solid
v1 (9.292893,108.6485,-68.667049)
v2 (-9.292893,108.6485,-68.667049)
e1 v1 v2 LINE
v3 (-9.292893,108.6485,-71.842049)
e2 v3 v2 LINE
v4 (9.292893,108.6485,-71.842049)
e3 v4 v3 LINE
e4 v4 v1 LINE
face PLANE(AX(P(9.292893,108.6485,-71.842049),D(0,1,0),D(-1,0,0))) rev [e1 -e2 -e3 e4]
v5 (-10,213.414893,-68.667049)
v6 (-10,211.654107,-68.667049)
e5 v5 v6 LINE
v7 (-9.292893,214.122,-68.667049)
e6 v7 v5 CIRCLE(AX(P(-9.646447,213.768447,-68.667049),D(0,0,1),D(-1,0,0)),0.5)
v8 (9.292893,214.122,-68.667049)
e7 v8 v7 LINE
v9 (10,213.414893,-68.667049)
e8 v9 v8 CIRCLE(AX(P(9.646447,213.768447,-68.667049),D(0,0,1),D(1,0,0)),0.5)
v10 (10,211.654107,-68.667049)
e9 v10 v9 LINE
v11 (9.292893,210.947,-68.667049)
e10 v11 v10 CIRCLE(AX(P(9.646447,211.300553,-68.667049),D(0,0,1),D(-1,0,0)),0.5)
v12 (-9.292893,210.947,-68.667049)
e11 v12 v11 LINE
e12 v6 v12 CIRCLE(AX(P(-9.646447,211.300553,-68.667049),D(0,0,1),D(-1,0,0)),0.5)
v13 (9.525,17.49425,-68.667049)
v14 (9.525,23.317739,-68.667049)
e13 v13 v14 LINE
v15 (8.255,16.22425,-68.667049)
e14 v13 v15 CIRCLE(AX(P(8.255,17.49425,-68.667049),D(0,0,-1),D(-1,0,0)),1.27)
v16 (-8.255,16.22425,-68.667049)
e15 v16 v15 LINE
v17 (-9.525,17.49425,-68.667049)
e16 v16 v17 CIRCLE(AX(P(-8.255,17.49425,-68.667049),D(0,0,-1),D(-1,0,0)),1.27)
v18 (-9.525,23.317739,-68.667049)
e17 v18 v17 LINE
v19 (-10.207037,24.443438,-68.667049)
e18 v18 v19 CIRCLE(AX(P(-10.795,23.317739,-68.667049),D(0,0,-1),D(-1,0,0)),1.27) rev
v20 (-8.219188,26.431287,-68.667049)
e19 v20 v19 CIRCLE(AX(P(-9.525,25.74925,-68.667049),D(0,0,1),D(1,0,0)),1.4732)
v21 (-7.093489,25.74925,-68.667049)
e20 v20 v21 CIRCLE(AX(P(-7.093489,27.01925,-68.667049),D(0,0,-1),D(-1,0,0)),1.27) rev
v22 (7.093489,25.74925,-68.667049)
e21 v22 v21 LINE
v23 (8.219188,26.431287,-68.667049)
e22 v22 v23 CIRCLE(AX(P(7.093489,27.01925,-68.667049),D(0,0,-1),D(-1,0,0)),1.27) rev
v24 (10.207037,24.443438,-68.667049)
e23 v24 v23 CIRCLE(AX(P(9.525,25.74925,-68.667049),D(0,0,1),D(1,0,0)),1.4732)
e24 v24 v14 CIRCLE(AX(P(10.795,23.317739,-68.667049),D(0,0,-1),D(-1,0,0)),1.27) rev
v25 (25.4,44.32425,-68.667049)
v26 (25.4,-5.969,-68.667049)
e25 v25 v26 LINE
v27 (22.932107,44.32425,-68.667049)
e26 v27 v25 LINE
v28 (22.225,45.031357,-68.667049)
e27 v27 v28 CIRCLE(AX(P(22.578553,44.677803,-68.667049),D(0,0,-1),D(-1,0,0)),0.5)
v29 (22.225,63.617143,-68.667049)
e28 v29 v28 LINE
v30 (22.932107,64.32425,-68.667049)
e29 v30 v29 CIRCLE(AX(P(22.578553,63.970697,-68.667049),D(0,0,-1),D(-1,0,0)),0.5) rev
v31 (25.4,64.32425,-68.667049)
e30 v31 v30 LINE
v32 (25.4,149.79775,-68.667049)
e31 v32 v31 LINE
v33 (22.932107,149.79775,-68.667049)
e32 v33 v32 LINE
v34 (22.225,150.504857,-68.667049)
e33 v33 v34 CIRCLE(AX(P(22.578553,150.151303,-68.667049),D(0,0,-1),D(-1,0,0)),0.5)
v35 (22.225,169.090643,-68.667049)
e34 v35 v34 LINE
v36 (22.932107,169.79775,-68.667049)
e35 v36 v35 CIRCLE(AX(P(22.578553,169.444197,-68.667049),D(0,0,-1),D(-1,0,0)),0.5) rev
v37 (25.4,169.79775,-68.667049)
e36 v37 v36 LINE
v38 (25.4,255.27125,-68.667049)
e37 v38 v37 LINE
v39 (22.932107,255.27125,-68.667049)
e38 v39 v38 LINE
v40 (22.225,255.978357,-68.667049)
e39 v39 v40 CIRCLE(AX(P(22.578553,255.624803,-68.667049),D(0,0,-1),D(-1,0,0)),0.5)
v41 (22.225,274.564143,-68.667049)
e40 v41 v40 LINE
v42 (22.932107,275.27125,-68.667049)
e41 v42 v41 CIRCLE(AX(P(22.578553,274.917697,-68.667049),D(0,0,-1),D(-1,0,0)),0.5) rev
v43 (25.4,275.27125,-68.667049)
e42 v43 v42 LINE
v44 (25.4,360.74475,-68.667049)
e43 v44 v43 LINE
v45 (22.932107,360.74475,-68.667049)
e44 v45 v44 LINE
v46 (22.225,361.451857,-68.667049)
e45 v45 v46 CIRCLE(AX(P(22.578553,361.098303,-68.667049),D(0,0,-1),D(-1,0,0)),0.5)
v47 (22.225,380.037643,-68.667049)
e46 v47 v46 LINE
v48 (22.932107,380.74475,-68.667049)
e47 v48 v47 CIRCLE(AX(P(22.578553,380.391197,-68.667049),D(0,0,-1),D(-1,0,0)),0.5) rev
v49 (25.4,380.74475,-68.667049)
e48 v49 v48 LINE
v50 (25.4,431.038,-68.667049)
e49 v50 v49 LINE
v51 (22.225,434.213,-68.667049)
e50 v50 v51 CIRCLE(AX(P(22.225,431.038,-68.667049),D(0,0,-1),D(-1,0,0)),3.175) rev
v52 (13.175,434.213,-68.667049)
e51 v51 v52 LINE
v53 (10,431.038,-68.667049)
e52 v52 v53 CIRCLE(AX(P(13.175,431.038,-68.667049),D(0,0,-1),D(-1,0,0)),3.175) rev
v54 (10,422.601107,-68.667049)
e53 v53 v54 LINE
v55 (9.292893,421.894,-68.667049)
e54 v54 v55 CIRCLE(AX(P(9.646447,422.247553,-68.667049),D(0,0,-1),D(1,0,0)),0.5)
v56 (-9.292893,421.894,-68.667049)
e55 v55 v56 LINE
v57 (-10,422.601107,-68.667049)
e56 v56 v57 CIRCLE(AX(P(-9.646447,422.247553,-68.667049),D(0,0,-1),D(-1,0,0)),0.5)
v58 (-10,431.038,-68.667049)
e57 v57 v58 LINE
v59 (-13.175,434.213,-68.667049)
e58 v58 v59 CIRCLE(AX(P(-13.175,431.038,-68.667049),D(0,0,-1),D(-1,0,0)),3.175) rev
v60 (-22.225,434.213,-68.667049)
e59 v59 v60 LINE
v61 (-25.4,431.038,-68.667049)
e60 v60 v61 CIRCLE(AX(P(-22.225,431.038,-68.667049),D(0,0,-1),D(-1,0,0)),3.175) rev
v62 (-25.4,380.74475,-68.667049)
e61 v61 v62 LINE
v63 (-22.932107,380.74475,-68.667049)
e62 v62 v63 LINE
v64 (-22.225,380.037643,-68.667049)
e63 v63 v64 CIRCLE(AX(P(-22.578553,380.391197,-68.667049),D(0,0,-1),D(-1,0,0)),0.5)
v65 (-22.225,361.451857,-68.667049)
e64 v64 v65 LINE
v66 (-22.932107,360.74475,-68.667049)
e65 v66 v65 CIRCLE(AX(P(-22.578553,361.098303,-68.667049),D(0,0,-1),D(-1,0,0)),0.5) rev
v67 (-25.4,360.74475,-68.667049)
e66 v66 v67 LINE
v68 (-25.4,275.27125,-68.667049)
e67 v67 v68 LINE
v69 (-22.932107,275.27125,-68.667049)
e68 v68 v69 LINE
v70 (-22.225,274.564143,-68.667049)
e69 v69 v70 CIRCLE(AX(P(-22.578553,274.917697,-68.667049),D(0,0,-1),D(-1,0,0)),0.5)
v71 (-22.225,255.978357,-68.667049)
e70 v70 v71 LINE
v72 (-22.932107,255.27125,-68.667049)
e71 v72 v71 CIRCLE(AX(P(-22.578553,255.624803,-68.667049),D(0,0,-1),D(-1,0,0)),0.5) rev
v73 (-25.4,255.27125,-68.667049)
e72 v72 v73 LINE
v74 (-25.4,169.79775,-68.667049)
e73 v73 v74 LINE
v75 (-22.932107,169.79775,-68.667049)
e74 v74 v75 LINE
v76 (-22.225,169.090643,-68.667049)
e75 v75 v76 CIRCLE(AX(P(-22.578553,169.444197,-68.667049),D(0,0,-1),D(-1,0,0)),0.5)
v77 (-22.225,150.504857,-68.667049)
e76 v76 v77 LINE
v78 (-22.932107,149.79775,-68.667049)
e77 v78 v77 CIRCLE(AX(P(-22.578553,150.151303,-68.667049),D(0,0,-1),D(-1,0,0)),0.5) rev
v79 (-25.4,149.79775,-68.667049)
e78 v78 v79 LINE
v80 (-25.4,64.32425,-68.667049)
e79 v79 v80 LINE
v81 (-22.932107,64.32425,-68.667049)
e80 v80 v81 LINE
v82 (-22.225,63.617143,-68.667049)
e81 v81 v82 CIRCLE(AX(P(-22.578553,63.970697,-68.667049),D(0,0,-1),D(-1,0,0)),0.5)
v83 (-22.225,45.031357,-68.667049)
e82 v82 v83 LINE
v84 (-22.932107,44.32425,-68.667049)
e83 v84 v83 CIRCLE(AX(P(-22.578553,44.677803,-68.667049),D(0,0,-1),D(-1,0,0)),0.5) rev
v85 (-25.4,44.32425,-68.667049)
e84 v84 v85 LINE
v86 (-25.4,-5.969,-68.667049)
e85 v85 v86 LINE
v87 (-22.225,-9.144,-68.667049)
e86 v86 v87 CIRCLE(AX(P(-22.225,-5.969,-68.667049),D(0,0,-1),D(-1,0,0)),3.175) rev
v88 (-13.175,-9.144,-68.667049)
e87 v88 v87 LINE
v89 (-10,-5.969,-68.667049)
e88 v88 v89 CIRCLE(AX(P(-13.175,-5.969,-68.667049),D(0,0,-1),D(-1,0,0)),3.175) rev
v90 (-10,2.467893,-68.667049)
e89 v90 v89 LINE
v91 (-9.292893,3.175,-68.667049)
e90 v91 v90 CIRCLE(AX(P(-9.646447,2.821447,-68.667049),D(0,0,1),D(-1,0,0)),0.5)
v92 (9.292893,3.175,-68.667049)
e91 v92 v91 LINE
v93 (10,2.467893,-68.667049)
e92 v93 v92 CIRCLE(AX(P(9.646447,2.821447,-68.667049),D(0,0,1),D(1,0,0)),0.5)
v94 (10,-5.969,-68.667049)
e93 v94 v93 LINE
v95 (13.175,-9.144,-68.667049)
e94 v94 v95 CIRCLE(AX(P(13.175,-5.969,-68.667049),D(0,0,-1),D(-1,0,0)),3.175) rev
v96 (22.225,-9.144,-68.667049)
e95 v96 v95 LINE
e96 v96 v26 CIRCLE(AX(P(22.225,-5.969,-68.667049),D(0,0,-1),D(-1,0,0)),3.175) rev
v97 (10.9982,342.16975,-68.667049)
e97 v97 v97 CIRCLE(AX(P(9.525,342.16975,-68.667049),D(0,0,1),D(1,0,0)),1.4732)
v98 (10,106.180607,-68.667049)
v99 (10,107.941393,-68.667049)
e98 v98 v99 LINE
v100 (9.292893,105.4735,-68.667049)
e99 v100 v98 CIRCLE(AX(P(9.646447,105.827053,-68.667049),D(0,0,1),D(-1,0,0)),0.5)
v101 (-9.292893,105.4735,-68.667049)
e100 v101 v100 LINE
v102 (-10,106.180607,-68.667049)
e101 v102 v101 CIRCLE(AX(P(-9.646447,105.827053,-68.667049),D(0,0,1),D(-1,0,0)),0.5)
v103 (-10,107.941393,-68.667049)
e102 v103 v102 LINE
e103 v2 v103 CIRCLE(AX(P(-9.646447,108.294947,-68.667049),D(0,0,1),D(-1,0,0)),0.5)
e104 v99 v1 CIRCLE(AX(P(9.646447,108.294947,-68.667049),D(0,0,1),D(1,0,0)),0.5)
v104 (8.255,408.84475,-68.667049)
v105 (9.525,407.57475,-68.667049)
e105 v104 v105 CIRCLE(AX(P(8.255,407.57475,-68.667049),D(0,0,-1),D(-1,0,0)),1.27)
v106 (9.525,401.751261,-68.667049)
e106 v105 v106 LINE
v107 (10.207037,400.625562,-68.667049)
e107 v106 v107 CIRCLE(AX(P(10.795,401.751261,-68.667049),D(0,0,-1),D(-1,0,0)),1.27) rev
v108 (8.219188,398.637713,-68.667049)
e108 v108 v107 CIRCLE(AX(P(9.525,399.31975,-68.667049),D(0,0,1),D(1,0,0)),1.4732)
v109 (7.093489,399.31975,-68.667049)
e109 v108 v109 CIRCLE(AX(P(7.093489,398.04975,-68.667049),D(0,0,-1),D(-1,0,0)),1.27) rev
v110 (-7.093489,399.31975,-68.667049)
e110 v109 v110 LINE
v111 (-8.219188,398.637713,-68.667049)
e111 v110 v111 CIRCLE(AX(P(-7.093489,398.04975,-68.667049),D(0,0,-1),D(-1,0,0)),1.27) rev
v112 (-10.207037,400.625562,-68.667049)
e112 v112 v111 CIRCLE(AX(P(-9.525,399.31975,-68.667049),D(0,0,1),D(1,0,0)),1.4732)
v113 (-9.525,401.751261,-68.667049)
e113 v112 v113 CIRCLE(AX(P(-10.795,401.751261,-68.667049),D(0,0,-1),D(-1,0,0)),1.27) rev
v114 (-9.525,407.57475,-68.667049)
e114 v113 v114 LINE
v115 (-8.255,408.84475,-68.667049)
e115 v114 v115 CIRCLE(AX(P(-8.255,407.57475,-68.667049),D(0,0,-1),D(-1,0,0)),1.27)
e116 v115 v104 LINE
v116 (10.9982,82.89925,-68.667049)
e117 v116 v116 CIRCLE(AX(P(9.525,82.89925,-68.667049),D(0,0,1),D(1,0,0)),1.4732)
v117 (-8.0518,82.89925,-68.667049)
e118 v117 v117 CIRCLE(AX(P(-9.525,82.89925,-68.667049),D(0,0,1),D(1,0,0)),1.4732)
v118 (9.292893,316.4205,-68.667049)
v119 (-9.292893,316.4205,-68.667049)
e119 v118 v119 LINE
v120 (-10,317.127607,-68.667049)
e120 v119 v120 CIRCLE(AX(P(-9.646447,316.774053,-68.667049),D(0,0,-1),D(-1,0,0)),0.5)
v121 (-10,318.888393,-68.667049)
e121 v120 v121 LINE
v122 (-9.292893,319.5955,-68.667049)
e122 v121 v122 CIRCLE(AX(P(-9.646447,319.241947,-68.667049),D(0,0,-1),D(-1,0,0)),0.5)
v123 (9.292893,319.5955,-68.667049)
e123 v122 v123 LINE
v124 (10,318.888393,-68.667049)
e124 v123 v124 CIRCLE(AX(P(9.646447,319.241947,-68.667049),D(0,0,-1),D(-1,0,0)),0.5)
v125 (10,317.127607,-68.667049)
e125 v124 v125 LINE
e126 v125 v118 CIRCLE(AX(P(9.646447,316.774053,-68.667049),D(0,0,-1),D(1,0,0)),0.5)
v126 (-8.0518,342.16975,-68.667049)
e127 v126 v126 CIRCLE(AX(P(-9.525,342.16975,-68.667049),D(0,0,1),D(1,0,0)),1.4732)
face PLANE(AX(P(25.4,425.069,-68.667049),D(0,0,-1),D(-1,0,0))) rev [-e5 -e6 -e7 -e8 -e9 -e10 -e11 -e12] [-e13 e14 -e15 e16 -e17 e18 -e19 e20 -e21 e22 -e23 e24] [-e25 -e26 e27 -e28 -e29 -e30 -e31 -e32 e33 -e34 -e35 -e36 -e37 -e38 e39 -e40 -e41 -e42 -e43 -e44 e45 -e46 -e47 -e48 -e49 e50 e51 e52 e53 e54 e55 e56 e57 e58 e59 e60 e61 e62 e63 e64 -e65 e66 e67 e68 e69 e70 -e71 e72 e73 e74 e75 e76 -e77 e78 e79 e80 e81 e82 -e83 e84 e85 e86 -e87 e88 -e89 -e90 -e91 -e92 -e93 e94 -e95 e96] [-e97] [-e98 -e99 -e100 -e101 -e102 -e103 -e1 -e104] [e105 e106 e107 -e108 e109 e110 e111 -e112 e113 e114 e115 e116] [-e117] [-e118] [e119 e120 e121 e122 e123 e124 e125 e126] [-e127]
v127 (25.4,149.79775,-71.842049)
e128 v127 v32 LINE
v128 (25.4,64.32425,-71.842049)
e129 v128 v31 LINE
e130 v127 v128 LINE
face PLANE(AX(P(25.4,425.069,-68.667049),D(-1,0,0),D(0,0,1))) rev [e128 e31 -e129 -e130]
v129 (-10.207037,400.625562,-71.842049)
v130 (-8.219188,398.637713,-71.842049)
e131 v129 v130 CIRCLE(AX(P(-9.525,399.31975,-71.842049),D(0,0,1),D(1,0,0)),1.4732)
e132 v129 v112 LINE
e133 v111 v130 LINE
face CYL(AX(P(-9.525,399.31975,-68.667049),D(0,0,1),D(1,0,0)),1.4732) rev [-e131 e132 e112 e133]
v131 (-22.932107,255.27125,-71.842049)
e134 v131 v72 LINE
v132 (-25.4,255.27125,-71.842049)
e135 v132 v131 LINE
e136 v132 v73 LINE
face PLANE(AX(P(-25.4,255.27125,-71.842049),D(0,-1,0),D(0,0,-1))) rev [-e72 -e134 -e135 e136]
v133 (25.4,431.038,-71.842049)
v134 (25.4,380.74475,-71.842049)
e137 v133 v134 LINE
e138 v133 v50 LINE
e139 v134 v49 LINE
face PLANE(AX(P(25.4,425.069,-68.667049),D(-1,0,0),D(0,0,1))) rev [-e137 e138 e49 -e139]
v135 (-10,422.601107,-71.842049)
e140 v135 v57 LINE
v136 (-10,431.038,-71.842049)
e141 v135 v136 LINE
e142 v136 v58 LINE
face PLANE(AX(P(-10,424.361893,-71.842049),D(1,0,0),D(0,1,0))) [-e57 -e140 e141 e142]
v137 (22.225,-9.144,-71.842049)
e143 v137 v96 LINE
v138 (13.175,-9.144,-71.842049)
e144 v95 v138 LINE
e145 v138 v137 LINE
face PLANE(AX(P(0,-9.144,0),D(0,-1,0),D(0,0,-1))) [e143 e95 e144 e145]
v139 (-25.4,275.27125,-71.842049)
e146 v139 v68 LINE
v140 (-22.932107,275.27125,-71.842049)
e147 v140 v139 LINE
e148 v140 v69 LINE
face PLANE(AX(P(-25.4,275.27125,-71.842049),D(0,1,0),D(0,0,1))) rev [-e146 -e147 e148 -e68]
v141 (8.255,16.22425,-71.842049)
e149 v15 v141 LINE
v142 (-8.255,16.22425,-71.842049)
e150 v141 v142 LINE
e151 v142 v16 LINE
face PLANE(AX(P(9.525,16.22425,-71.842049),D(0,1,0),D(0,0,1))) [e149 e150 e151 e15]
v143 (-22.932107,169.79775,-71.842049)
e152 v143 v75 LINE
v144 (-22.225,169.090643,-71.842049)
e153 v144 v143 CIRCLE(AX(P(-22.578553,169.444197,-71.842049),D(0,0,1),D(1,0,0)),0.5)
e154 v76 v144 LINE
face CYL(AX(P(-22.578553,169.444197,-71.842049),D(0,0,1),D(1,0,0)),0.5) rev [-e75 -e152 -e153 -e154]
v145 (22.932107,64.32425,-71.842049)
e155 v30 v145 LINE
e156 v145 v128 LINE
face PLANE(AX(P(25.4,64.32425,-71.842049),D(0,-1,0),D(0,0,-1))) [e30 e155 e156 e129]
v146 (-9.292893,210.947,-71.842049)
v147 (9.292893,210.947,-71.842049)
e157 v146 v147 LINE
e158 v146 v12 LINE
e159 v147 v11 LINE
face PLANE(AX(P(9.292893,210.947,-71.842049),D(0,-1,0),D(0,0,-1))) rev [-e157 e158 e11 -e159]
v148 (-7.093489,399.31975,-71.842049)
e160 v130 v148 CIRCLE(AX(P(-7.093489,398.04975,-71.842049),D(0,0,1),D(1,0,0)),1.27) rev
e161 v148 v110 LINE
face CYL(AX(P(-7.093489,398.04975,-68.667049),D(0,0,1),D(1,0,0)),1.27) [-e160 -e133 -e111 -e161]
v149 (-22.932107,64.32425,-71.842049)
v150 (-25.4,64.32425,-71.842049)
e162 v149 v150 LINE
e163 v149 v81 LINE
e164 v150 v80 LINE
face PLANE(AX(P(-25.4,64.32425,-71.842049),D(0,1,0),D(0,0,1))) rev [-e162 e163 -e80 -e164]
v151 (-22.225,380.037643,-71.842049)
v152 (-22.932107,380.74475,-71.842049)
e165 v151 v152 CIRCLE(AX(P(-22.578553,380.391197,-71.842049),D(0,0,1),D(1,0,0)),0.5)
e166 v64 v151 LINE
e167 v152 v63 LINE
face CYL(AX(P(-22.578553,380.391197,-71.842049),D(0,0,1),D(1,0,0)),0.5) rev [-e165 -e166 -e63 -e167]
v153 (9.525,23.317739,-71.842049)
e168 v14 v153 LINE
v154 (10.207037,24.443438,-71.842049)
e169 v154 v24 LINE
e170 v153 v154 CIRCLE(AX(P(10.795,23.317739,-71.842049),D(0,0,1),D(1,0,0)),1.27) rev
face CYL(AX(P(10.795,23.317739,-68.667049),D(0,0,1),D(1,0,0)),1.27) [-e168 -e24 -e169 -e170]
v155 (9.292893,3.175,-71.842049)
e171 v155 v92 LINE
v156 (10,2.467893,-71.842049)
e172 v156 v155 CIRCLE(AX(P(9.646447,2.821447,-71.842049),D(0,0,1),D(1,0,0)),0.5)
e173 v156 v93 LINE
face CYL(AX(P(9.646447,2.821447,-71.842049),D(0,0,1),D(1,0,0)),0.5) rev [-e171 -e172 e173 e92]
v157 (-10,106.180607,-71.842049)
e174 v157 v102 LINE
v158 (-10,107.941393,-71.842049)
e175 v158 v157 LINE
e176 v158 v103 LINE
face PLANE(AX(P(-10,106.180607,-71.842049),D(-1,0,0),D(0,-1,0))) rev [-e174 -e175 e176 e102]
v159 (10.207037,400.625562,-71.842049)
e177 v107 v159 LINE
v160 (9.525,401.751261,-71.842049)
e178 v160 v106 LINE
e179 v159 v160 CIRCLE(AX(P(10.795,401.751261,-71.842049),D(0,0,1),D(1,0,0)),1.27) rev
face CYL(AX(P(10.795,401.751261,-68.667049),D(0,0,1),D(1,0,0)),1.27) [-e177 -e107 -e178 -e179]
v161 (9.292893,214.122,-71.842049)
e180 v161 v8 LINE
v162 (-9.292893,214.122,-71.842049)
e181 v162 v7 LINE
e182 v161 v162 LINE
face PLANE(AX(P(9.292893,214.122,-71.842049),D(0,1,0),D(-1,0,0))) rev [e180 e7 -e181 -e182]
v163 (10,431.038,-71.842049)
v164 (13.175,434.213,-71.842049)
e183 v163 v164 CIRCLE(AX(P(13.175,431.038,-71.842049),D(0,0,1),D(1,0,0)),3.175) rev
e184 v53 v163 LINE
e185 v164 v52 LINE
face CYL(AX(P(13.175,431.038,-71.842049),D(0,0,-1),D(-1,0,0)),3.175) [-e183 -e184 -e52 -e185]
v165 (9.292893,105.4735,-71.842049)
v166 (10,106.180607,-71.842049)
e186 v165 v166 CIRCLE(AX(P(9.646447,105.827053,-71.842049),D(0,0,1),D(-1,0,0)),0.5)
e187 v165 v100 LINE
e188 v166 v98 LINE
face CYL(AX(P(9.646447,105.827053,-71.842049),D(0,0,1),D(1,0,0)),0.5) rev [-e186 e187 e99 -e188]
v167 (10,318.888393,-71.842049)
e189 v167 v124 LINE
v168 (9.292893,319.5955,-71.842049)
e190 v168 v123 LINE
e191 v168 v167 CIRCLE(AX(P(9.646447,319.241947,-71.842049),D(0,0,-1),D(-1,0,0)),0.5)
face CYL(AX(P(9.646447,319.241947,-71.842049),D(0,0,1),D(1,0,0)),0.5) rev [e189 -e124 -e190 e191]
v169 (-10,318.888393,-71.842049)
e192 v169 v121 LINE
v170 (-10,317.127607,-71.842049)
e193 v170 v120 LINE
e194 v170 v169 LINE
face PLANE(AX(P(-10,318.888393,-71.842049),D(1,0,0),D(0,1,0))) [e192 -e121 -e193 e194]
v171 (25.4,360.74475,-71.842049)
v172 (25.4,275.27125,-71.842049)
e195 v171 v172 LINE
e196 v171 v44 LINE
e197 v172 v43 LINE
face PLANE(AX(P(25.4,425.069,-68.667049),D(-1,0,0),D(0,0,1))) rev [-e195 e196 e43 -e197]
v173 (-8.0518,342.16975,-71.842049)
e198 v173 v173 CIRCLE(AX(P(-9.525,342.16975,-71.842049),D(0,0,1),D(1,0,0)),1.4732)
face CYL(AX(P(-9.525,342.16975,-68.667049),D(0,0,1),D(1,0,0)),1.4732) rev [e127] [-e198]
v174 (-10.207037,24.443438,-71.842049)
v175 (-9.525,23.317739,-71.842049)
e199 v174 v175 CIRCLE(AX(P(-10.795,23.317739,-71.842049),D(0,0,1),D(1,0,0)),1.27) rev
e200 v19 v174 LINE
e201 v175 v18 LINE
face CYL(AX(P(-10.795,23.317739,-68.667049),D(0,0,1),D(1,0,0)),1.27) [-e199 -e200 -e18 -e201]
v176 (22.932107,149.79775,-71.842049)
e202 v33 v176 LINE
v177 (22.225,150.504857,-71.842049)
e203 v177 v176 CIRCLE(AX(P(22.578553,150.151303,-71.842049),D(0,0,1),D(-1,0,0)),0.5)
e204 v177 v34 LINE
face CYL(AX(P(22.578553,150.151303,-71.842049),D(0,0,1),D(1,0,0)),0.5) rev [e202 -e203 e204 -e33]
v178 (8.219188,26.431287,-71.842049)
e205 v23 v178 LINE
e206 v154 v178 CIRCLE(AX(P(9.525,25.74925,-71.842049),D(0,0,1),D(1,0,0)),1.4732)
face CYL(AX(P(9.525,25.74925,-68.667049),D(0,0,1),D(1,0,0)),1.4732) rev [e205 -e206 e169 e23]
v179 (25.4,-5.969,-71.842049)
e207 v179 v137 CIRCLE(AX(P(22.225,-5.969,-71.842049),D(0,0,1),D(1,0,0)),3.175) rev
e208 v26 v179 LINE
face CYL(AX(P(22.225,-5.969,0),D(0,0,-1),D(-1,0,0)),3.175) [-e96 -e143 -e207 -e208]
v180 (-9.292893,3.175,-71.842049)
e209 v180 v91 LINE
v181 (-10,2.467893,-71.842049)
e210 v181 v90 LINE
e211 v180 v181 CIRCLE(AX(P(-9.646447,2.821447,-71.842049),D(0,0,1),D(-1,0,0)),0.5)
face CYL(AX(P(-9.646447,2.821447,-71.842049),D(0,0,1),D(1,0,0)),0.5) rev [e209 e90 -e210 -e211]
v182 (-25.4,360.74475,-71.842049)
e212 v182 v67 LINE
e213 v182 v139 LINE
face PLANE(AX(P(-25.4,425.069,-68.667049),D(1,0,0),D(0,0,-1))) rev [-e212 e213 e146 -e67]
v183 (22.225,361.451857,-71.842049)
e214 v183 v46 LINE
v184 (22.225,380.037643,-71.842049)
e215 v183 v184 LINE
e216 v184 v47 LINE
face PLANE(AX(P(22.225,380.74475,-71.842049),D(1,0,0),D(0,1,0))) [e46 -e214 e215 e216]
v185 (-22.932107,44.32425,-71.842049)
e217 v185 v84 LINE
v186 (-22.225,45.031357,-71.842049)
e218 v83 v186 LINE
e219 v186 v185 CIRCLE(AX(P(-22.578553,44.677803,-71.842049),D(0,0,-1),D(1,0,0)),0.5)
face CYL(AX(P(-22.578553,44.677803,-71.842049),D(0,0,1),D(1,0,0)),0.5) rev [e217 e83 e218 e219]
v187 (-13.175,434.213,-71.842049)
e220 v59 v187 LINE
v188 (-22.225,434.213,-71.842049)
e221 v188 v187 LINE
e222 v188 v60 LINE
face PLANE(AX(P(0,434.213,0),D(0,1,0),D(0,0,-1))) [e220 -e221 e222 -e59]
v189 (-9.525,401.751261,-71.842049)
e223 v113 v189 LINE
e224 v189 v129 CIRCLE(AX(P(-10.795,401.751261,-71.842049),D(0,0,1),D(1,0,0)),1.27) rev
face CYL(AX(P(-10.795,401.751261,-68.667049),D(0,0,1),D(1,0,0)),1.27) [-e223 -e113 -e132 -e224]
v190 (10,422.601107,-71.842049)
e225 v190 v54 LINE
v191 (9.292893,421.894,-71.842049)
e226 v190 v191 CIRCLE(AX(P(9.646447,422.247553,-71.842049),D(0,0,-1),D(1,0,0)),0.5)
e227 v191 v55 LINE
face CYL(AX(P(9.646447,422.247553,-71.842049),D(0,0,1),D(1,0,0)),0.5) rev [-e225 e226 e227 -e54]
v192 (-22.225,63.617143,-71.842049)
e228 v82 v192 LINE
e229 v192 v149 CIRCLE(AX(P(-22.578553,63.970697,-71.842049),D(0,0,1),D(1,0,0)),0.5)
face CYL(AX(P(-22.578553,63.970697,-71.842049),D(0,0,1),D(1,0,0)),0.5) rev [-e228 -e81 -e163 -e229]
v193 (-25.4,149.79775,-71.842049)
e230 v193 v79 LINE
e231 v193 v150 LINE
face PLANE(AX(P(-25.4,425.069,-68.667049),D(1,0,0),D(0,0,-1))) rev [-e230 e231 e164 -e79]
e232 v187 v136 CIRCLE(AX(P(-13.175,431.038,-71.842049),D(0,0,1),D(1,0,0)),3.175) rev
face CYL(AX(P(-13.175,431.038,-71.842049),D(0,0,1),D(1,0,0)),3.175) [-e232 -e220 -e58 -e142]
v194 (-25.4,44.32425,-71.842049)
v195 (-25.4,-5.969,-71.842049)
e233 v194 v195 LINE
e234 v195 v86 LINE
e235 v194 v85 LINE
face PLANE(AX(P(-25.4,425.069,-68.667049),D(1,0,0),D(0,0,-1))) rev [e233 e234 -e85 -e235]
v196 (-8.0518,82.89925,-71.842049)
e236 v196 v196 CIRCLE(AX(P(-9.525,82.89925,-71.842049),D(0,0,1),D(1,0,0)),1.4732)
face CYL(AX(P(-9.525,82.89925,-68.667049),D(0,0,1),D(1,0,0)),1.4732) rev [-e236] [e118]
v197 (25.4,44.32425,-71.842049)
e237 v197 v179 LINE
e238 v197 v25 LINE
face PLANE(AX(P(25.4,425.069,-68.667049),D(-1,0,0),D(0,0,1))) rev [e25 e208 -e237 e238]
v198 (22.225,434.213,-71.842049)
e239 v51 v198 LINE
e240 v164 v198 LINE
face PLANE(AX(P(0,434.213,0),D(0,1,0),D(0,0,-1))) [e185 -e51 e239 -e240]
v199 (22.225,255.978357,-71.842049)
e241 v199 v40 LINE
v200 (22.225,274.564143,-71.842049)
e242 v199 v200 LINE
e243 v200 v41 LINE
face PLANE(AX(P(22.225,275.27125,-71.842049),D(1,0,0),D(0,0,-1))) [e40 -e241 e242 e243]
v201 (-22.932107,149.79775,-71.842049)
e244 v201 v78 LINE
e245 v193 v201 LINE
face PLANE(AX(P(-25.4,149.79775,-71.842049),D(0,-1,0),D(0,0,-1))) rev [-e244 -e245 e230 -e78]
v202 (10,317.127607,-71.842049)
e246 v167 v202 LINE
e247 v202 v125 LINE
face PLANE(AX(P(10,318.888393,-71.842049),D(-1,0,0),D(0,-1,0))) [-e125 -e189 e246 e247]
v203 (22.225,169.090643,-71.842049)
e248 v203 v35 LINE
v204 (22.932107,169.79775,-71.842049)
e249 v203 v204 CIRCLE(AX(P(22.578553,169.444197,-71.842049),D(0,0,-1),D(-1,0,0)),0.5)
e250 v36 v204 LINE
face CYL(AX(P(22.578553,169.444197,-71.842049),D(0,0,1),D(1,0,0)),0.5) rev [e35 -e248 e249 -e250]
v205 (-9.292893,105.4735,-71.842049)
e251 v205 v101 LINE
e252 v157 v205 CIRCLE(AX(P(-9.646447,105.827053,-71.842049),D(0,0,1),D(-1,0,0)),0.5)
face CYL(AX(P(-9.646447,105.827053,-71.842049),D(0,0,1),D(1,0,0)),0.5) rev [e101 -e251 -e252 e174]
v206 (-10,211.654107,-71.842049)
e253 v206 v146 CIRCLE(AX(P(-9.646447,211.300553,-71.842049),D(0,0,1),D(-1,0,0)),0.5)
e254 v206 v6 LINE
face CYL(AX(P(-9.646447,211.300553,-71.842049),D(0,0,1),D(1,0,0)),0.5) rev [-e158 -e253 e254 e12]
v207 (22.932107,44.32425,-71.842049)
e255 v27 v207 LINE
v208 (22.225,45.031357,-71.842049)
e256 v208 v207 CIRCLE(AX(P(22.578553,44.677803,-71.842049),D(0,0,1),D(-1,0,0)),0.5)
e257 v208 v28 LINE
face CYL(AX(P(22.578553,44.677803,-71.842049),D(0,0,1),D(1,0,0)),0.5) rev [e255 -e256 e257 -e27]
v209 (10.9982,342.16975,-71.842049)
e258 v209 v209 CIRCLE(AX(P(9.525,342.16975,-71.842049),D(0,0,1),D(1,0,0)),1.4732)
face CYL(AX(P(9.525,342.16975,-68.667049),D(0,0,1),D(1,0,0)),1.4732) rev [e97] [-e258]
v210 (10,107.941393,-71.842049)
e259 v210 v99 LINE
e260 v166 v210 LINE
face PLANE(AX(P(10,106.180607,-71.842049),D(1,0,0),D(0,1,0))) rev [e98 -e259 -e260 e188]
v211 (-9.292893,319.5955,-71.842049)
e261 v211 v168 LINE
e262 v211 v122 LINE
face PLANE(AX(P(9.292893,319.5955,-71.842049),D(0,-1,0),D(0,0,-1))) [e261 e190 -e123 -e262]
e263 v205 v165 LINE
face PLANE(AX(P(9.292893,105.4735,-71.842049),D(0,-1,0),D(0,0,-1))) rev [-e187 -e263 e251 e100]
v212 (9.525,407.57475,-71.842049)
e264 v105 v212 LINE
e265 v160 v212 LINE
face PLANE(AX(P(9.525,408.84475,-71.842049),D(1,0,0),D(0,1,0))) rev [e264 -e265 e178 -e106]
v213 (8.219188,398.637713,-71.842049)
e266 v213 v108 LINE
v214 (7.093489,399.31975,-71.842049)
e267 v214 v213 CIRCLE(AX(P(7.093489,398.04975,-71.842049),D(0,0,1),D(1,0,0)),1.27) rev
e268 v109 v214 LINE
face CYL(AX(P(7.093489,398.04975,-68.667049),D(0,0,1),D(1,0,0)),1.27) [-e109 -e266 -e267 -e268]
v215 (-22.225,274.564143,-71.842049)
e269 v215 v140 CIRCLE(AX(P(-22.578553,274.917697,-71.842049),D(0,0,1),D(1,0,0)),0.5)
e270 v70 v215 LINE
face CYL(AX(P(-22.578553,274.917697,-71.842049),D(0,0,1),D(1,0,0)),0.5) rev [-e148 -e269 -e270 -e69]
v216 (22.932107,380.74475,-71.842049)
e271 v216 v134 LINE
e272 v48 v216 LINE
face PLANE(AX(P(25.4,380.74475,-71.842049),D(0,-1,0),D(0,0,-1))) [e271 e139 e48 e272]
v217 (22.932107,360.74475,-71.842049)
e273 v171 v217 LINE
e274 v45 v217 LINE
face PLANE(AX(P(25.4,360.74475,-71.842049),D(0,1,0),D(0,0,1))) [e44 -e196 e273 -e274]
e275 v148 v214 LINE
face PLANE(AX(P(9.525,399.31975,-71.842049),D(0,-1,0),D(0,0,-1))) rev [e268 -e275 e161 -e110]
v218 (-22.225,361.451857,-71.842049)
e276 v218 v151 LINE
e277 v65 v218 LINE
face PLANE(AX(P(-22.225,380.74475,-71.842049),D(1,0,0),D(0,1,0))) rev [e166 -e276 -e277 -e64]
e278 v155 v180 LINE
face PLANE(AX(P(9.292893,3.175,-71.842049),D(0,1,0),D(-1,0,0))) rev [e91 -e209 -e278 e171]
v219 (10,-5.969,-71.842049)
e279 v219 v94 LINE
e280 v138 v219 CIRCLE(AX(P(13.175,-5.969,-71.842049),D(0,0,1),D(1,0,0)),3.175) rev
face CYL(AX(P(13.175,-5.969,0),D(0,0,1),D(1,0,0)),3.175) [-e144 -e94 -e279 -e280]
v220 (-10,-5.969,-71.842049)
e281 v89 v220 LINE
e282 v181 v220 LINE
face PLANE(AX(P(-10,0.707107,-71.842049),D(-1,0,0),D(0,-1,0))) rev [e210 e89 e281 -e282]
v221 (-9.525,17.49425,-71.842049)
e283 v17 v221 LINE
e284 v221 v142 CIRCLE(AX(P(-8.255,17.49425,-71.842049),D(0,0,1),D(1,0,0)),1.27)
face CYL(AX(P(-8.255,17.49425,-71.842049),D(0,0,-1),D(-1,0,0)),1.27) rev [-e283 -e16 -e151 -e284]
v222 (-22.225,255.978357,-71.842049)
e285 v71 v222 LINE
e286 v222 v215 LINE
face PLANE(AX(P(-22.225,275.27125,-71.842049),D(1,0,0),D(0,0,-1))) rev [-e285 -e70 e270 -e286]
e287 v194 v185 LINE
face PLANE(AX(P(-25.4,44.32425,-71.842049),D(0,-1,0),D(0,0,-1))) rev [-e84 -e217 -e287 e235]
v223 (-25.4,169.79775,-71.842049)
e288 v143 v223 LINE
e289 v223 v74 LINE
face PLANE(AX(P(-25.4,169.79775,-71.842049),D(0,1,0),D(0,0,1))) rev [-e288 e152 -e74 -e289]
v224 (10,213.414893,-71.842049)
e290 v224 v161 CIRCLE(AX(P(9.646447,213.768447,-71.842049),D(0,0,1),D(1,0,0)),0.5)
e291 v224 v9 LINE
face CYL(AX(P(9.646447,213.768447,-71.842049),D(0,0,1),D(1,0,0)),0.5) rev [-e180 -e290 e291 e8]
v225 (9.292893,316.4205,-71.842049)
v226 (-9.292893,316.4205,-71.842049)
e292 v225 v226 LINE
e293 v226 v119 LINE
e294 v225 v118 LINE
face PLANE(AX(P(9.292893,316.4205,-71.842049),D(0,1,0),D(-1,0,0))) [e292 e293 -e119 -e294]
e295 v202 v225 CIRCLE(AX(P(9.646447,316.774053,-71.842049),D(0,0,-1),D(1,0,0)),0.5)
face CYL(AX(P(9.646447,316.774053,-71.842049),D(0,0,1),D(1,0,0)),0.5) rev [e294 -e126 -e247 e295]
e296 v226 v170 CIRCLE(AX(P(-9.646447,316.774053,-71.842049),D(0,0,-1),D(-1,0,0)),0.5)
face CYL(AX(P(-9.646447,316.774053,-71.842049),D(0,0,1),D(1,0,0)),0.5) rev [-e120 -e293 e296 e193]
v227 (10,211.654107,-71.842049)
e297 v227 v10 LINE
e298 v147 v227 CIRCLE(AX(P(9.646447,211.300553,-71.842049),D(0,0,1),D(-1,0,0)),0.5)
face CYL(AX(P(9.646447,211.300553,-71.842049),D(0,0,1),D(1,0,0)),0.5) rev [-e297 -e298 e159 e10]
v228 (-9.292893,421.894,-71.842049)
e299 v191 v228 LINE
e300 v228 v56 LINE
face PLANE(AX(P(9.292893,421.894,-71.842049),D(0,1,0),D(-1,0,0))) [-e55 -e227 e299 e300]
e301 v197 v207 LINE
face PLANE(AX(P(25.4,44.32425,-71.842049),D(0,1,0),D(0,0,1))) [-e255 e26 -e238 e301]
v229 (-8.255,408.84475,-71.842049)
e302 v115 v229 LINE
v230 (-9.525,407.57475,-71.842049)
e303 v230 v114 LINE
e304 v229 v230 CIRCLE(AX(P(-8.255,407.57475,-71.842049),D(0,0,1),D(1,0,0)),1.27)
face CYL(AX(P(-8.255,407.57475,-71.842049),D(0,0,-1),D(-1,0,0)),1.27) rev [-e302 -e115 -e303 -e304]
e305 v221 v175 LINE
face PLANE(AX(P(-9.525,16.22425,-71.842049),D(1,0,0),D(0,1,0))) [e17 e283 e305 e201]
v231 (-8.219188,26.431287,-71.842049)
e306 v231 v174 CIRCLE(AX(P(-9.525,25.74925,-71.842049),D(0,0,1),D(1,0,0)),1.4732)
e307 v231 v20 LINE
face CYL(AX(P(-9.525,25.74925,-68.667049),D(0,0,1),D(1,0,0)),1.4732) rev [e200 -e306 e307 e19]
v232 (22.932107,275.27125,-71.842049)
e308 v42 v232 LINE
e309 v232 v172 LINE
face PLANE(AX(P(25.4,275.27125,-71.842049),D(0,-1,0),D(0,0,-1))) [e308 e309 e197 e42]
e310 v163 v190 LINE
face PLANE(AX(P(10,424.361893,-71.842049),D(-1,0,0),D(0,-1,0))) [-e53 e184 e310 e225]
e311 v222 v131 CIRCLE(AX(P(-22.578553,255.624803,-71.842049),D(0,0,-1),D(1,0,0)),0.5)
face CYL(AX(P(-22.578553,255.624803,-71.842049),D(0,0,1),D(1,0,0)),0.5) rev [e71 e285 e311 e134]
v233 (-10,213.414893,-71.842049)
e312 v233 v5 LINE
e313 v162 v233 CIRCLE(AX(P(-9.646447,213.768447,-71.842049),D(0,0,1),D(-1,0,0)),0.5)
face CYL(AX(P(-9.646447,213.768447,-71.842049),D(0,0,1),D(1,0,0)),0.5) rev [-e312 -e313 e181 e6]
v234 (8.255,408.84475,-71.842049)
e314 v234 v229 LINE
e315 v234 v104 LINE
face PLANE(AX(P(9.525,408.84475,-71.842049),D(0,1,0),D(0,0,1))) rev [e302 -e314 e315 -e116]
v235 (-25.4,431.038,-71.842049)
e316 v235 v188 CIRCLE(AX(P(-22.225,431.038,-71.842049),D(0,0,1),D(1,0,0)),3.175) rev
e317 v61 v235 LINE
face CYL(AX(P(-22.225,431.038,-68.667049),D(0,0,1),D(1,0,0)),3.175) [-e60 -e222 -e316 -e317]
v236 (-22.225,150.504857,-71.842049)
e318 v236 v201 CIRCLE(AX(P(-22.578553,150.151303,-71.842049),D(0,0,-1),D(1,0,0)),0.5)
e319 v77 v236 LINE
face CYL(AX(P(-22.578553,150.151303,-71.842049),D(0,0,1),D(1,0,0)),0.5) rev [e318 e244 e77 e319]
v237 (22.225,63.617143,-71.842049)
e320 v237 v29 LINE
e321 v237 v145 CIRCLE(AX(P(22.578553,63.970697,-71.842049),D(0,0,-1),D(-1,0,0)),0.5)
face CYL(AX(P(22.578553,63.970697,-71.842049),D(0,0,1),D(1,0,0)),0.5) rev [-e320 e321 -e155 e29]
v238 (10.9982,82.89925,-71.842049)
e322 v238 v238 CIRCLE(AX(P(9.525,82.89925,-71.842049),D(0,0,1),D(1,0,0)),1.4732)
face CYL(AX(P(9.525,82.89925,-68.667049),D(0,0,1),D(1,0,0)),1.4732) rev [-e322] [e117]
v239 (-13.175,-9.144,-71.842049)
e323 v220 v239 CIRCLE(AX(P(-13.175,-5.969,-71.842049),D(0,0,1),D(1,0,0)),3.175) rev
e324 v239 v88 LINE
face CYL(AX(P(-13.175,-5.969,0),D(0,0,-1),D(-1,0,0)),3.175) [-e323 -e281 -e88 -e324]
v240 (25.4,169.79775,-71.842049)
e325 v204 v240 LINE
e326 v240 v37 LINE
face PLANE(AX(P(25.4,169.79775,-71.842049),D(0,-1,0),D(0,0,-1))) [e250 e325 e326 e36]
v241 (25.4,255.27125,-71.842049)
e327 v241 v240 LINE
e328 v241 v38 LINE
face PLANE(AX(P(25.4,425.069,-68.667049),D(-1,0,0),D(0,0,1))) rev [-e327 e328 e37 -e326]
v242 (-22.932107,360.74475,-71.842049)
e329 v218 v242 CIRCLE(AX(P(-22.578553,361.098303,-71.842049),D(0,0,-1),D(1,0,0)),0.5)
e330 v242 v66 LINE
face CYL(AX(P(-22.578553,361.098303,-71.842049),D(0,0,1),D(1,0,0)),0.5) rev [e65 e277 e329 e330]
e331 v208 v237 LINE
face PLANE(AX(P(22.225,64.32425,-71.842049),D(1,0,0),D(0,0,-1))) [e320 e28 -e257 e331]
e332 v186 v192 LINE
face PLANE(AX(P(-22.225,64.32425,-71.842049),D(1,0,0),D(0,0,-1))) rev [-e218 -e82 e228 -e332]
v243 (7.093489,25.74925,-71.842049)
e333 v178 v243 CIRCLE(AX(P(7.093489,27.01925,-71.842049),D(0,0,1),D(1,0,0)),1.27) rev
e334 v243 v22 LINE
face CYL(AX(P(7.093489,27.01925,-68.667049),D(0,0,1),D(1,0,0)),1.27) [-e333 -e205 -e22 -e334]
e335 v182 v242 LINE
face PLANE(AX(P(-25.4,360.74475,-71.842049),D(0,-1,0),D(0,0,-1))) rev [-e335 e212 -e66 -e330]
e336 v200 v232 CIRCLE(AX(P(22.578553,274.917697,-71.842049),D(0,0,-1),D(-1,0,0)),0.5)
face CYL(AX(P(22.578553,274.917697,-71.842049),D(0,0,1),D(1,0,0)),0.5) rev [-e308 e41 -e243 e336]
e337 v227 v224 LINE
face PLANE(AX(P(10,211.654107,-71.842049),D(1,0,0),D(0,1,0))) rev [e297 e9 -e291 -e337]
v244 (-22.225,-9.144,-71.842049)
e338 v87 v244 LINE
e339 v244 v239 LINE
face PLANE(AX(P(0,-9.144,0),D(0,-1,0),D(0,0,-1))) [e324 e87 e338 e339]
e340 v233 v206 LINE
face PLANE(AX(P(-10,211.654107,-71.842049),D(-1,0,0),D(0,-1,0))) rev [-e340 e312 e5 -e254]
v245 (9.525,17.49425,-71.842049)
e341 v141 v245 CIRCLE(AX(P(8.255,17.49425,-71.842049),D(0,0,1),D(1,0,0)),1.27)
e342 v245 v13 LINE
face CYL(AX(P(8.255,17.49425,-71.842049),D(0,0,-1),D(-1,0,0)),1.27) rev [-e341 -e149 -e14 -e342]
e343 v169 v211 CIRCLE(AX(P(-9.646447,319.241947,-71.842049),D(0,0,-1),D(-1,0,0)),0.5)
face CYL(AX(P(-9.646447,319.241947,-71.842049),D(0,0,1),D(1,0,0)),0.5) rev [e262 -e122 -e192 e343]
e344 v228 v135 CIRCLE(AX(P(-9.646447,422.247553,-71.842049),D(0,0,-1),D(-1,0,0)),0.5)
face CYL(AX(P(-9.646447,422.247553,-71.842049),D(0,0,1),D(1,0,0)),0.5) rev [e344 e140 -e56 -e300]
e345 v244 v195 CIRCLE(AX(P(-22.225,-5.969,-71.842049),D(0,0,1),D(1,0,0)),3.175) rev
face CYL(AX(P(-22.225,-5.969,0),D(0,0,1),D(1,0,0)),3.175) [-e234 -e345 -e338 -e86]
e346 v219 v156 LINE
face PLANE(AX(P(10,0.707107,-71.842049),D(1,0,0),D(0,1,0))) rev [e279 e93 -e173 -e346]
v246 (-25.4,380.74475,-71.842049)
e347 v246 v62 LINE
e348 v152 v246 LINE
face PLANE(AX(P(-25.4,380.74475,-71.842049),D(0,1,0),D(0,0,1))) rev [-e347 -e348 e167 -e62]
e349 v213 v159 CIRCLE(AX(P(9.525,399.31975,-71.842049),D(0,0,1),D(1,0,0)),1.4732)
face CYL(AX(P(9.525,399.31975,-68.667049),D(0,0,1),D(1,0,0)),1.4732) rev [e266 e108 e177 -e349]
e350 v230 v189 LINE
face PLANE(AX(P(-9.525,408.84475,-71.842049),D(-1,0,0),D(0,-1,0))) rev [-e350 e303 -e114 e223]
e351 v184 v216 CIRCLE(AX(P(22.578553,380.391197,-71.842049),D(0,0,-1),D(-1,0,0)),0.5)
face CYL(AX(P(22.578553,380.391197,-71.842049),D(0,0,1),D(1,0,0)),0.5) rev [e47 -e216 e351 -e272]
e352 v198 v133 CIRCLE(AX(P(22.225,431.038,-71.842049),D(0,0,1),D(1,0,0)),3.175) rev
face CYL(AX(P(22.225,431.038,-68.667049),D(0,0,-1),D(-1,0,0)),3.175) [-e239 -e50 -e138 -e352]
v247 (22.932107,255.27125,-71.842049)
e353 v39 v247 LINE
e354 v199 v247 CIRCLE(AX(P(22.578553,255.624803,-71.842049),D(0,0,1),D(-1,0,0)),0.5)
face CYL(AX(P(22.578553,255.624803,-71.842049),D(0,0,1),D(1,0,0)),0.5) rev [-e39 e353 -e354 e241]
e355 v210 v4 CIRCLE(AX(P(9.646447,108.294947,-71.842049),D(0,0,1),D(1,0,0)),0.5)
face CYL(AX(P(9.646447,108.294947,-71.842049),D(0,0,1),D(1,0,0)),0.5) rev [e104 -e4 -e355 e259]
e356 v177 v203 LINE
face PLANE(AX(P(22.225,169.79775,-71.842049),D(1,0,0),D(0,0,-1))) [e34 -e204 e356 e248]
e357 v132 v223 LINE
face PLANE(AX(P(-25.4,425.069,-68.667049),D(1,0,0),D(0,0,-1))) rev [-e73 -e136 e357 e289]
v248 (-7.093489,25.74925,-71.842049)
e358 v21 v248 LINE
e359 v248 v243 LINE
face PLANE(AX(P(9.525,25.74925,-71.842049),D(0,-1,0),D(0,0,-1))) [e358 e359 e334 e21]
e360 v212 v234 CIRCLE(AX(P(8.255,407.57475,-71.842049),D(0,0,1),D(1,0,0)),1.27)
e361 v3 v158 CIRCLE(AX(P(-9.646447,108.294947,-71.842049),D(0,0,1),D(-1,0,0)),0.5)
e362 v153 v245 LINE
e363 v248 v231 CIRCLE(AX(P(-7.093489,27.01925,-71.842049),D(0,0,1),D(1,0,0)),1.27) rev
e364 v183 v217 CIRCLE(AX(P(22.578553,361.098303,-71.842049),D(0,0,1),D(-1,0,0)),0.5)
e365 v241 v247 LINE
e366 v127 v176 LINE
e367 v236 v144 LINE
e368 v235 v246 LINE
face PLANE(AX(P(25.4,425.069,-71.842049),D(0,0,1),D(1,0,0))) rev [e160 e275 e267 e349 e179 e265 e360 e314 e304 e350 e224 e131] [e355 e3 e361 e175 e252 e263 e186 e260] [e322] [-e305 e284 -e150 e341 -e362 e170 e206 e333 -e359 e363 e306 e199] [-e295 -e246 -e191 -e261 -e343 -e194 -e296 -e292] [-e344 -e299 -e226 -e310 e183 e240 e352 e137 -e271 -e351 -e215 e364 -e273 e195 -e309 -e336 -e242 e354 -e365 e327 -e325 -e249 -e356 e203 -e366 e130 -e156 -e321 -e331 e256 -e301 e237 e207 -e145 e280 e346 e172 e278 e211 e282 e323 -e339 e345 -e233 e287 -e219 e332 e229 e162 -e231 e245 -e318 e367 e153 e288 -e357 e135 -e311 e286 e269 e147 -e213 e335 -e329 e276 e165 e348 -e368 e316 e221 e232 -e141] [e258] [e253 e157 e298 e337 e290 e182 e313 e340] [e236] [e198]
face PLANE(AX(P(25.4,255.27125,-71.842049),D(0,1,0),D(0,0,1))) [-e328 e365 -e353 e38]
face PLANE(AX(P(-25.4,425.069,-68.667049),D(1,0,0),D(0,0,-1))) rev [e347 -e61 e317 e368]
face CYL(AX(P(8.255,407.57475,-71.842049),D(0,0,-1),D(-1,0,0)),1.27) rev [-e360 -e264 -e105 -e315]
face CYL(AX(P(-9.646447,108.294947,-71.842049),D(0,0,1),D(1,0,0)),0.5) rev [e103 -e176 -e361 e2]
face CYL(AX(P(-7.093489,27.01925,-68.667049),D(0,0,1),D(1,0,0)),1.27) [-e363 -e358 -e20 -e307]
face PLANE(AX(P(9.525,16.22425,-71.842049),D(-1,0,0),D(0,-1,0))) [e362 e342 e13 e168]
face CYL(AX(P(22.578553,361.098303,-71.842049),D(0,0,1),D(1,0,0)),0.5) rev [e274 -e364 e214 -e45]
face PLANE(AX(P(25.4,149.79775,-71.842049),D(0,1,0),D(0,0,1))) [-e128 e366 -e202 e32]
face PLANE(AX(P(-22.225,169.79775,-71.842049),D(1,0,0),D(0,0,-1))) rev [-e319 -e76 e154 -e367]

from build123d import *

# Parameters (mm, degrees)
SKETCH1_W               = 50.8
SKETCH1_H               = 3.175
BOSS_EXTRUDE1_DEPTH     = 425.069
RIBSLOTS_DEPTH          = 426.839048686
CUSHIONINDEXTAB_START   = -1.27
SKETCH12_W              = 15.4
SKETCH12_H              = 3.175
CUSHIONINDEXTAB_DEPTH   = 10.414
FILLET1_R               = 3.175
SKETCH13_W              = 3.175
SKETCH13_H              = 20
CUT_EXTRUDE4_DEPTH      = 435.9668608
SKETCH14_R              = 0.5
CUT_EXTRUDE5_DEPTH      = 435.9668608
SKETCH_PATTERN1_START   = -71.842048969
SKETCH_PATTERN1_DEPTH   = 3.175
MIRROR4_COPY_1_SKETCH_R = 0.5
MIRROR4_COPY_1_DEPTH    = 435.9668608
MIRROR4_START           = -71.842048969
MIRROR4_COPY_2_DEPTH    = 3.175
F_4_CLEARANCE_HOLE1_D   = 2.9464
SKETCH19_W              = 19.05
SKETCH19_H              = 9.525
CUT_EXTRUDE6_DEPTH      = 435.9668608
FILLET2_R               = 1.27
FILLET2_OF_MIRROR7_R    = 1.27


# Read off the part's stored shape, not the designer's step: Sketch-Pattern1
with BuildPart() as part:
    # Sketch1 → Boss-Extrude1 (new body)
    with BuildSketch(Plane(origin=(0, 0, 0), x_dir=(1, 0, 0), z_dir=(0, 1, 0))):
        with Locations((0, 70.254548969)):
            Rectangle(SKETCH1_W, SKETCH1_H)
    extrude(amount=BOSS_EXTRUDE1_DEPTH)

    # Sketch11 → ribSlots (cut, through all)
    with BuildSketch(Plane.XY.offset(-68.667048969)):
        with BuildLine():
            Line((9.292893219, 105.4735), (-9.292893219, 105.4735))
            ThreePointArc((-9.292893219, 105.4735), (-10, 105.4735), (-10, 106.180606781))
            Line((-10, 106.180606781), (-10, 107.941393219))
            ThreePointArc((-10, 107.941393219), (-10, 108.6485), (-9.292893219, 108.6485))
            Line((-9.292893219, 108.6485), (9.292893219, 108.6485))
            ThreePointArc((9.292893219, 108.6485), (10, 108.6485), (10, 107.941393219))
            Line((10, 107.941393219), (10, 106.180606781))
            ThreePointArc((10, 106.180606781), (10, 105.4735), (9.292893219, 105.4735))
        make_face()
        with BuildLine():
            Line((9.292893219, 0), (-9.292893219, 0))
            ThreePointArc((-9.292893219, 0), (-10, 0), (-10, 0.707106781))
            Line((-10, 0.707106781), (-10, 2.467893219))
            ThreePointArc((-10, 2.467893219), (-10, 3.175), (-9.292893219, 3.175))
            Line((-9.292893219, 3.175), (9.292893219, 3.175))
            ThreePointArc((9.292893219, 3.175), (10, 3.175), (10, 2.467893219))
            Line((10, 2.467893219), (10, 0.707106781))
            ThreePointArc((10, 0.707106781), (10, 0), (9.292893219, 0))
        make_face()
        with BuildLine():
            Line((9.292893219, 210.947), (-9.292893219, 210.947))
            ThreePointArc((-9.292893219, 210.947), (-10, 210.947), (-10, 211.654106781))
            Line((-10, 211.654106781), (-10, 213.414893219))
            ThreePointArc((-10, 213.414893219), (-10, 214.122), (-9.292893219, 214.122))
            Line((-9.292893219, 214.122), (9.292893219, 214.122))
            ThreePointArc((9.292893219, 214.122), (10, 214.122), (10, 213.414893219))
            Line((10, 213.414893219), (10, 211.654106781))
            ThreePointArc((10, 211.654106781), (10, 210.947), (9.292893219, 210.947))
        make_face()
    ribslots = extrude(amount=-RIBSLOTS_DEPTH, mode=Mode.SUBTRACT)

    # Sketch12 → cushionIndexTab (add)
    with BuildSketch(Plane.XZ.offset(CUSHIONINDEXTAB_START)):
        with Locations((-17.7, -70.254548969)):
            Rectangle(SKETCH12_W, SKETCH12_H)
        with Locations((17.7, -70.254548969)):
            Rectangle(SKETCH12_W, SKETCH12_H)
    cushionindextab = extrude(amount=CUSHIONINDEXTAB_DEPTH)

    # Mirror2: ribSlots, cushionIndexTab across plane
    add(ribslots.mirror(Plane.ZX.offset(212.5345)), mode=Mode.SUBTRACT)
    add(cushionindextab.mirror(Plane.ZX.offset(212.5345)))

    # Fillet1
    fillet1_edges = [part.edges().sort_by_distance(p)[0] for p in [
        (-25.4, -9.144, -70.254548969),
        (-10, -9.144, -70.254548969),
        (25.4, -9.144, -70.254548969),
        (10, -9.144, -70.254548969),
        (-10, 434.213, -70.254548969),
        (-25.4, 434.213, -70.254548969),
        (10, 434.213, -70.254548969),
        (25.4, 434.213, -70.254548969),
    ]]
    fillet(fillet1_edges, radius=FILLET1_R)

    # Sketch13 → Cut-Extrude4 (cut, symmetric)
    with BuildSketch(Plane.XY.offset(-68.667048969)):
        with Locations((-23.8125, 370.74475)):
            Rectangle(SKETCH13_W, SKETCH13_H)
        with Locations((-23.8125, 265.27125)):
            Rectangle(SKETCH13_W, SKETCH13_H)
        with Locations((-23.8125, 159.79775)):
            Rectangle(SKETCH13_W, SKETCH13_H)
        with Locations((-23.8125, 54.32425)):
            Rectangle(SKETCH13_W, SKETCH13_H)
    cut_extrude4 = extrude(amount=CUT_EXTRUDE4_DEPTH, both=True, mode=Mode.SUBTRACT)

    # Sketch14 → Cut-Extrude5 (cut, symmetric)
    with BuildSketch(Plane.XY.offset(-68.667048969)):
        with Locations((-22.578553391, 380.391196609)):
            Circle(SKETCH14_R)
    cut_extrude5 = extrude(amount=CUT_EXTRUDE5_DEPTH, both=True, mode=Mode.SUBTRACT)

    # Sketch-Pattern1 outline → Sketch-Pattern1 (cut)
    with BuildSketch(Plane.XY.offset(SKETCH_PATTERN1_START)):
        with BuildLine():
            Line((-22.225, 275.27125), (-22.225, 274.564143219))
            ThreePointArc((-22.225, 274.564143219), (-22.078553391, 274.91769661), (-22.225, 275.27125))
        make_face()
        with BuildLine():
            Line((-22.932106781, 275.27125), (-22.225, 275.27125))
            ThreePointArc((-22.225, 275.27125), (-22.578553391, 275.417696609), (-22.932106781, 275.27125))
        make_face()
        with BuildLine():
            Line((-22.225, 169.79775), (-22.225, 169.090643219))
            ThreePointArc((-22.225, 169.090643219), (-22.078553391, 169.44419661), (-22.225, 169.79775))
        make_face()
        with BuildLine():
            Line((-22.932106781, 169.79775), (-22.225, 169.79775))
            ThreePointArc((-22.225, 169.79775), (-22.578553391, 169.944196609), (-22.932106781, 169.79775))
        make_face()
        with BuildLine():
            Line((-22.225, 64.32425), (-22.225, 63.617143219))
            ThreePointArc((-22.225, 63.617143219), (-22.078553391, 63.97069661), (-22.225, 64.32425))
        make_face()
        with BuildLine():
            Line((-22.932106781, 64.32425), (-22.225, 64.32425))
            ThreePointArc((-22.225, 64.32425), (-22.578553391, 64.470696609), (-22.932106781, 64.32425))
        make_face()
    sketch_pattern1 = extrude(amount=SKETCH_PATTERN1_DEPTH, mode=Mode.SUBTRACT)

    # Mirror3: Cut-Extrude5, Sketch-Pattern1 across plane
    add(cut_extrude5.mirror(Plane.ZX.offset(212.5345)), mode=Mode.SUBTRACT)
    add(sketch_pattern1.mirror(Plane.ZX.offset(212.5345)), mode=Mode.SUBTRACT)

    # Mirror4: Cut-Extrude4, Cut-Extrude5, Sketch-Pattern1 across plane
    add(cut_extrude4.mirror(Plane(origin=(0, 0, 0), x_dir=(0, 0, 1), z_dir=(1, 0, 0))), mode=Mode.SUBTRACT)
    add(cut_extrude5.mirror(Plane(origin=(0, 0, 0), x_dir=(0, 0, 1), z_dir=(1, 0, 0))), mode=Mode.SUBTRACT)
    add(sketch_pattern1.mirror(Plane(origin=(0, 0, 0), x_dir=(0, 0, 1), z_dir=(1, 0, 0))), mode=Mode.SUBTRACT)

    # Mirror4 copy 1 sketch → Mirror4 copy 1 (cut, symmetric)
    with BuildSketch(Plane(origin=(0, 425.069, -68.667048969), x_dir=(-1, 0, 0), z_dir=(0, 0, 1))):
        with Locations((-22.578553391, 380.391196609)):
            Circle(MIRROR4_COPY_1_SKETCH_R)
    extrude(amount=MIRROR4_COPY_1_DEPTH, both=True, mode=Mode.SUBTRACT)

    # Mirror4 copy 2 sketch → Mirror4 copy 2 (cut)
    with BuildSketch(Plane(origin=(0, 425.069, 0), x_dir=(-1, 0, 0), z_dir=(0, 0, 1)).offset(MIRROR4_START)):
        with BuildLine():
            Line((-22.225, 275.27125), (-22.225, 274.564143219))
            ThreePointArc((-22.225, 274.564143219), (-22.078553391, 274.91769661), (-22.225, 275.27125))
        make_face()
        with BuildLine():
            Line((-22.932106781, 275.27125), (-22.225, 275.27125))
            ThreePointArc((-22.225, 275.27125), (-22.578553391, 275.417696609), (-22.932106781, 275.27125))
        make_face()
        with BuildLine():
            Line((-22.225, 169.79775), (-22.225, 169.090643219))
            ThreePointArc((-22.225, 169.090643219), (-22.078553391, 169.44419661), (-22.225, 169.79775))
        make_face()
        with BuildLine():
            Line((-22.932106781, 169.79775), (-22.225, 169.79775))
            ThreePointArc((-22.225, 169.79775), (-22.578553391, 169.944196609), (-22.932106781, 169.79775))
        make_face()
        with BuildLine():
            Line((-22.225, 64.32425), (-22.225, 63.617143219))
            ThreePointArc((-22.225, 63.617143219), (-22.078553391, 63.97069661), (-22.225, 64.32425))
        make_face()
        with BuildLine():
            Line((-22.932106781, 64.32425), (-22.225, 64.32425))
            ThreePointArc((-22.225, 64.32425), (-22.578553391, 64.470696609), (-22.932106781, 64.32425))
        make_face()
    extrude(amount=MIRROR4_COPY_2_DEPTH, mode=Mode.SUBTRACT)

    # #4 Clearance Hole1 (through all)
    with Locations(Plane.XY.offset(-68.667048969)):
        with Locations((9.525, 399.31975), (-9.525, 399.31975), (9.525, 342.16975), (-9.525, 342.16975)):
            f_4_clearance_hole1 = Hole(F_4_CLEARANCE_HOLE1_D / 2)

    # Sketch19 → Cut-Extrude6 (cut, symmetric)
    with BuildSketch(Plane.XY.offset(-68.667048969)):
        with Locations((0, 404.08225)):
            Rectangle(SKETCH19_W, SKETCH19_H)
    cut_extrude6 = extrude(amount=CUT_EXTRUDE6_DEPTH, both=True, mode=Mode.SUBTRACT)

    # Fillet2
    fillet2_edges = [part.edges().sort_by_distance(p)[0] for p in [
        (8.0518, 399.31975, -70.254548969),
        (9.525, 400.79295, -70.254548969),
        (-9.525, 400.79295, -70.254548969),
        (-9.525, 408.84475, -70.254548969),
        (9.525, 408.84475, -70.254548969),
        (-8.0518, 399.31975, -70.254548969),
    ]]
    fillet(fillet2_edges, radius=FILLET2_R)

    # Mirror7: #4 Clearance Hole1, Cut-Extrude6 across plane
    add(f_4_clearance_hole1.mirror(Plane.ZX.offset(212.5345)), mode=Mode.SUBTRACT)
    add(cut_extrude6.mirror(Plane.ZX.offset(212.5345)), mode=Mode.SUBTRACT)

    # Fillet2 of Mirror7
    fillet2_of_mirror7_edges = [part.edges().sort_by_distance(p)[0] for p in [
        (8.0518, 25.74925, -70.254548969),
        (9.525, 24.27605, -70.254548969),
        (-9.525, 24.27605, -70.254548969),
        (-9.525, 16.22425, -70.254548969),
        (9.525, 16.22425, -70.254548969),
        (-8.0518, 25.74925, -70.254548969),
    ]]
    fillet(fillet2_of_mirror7_edges, radius=FILLET2_OF_MIRROR7_R)


solid = part.part
